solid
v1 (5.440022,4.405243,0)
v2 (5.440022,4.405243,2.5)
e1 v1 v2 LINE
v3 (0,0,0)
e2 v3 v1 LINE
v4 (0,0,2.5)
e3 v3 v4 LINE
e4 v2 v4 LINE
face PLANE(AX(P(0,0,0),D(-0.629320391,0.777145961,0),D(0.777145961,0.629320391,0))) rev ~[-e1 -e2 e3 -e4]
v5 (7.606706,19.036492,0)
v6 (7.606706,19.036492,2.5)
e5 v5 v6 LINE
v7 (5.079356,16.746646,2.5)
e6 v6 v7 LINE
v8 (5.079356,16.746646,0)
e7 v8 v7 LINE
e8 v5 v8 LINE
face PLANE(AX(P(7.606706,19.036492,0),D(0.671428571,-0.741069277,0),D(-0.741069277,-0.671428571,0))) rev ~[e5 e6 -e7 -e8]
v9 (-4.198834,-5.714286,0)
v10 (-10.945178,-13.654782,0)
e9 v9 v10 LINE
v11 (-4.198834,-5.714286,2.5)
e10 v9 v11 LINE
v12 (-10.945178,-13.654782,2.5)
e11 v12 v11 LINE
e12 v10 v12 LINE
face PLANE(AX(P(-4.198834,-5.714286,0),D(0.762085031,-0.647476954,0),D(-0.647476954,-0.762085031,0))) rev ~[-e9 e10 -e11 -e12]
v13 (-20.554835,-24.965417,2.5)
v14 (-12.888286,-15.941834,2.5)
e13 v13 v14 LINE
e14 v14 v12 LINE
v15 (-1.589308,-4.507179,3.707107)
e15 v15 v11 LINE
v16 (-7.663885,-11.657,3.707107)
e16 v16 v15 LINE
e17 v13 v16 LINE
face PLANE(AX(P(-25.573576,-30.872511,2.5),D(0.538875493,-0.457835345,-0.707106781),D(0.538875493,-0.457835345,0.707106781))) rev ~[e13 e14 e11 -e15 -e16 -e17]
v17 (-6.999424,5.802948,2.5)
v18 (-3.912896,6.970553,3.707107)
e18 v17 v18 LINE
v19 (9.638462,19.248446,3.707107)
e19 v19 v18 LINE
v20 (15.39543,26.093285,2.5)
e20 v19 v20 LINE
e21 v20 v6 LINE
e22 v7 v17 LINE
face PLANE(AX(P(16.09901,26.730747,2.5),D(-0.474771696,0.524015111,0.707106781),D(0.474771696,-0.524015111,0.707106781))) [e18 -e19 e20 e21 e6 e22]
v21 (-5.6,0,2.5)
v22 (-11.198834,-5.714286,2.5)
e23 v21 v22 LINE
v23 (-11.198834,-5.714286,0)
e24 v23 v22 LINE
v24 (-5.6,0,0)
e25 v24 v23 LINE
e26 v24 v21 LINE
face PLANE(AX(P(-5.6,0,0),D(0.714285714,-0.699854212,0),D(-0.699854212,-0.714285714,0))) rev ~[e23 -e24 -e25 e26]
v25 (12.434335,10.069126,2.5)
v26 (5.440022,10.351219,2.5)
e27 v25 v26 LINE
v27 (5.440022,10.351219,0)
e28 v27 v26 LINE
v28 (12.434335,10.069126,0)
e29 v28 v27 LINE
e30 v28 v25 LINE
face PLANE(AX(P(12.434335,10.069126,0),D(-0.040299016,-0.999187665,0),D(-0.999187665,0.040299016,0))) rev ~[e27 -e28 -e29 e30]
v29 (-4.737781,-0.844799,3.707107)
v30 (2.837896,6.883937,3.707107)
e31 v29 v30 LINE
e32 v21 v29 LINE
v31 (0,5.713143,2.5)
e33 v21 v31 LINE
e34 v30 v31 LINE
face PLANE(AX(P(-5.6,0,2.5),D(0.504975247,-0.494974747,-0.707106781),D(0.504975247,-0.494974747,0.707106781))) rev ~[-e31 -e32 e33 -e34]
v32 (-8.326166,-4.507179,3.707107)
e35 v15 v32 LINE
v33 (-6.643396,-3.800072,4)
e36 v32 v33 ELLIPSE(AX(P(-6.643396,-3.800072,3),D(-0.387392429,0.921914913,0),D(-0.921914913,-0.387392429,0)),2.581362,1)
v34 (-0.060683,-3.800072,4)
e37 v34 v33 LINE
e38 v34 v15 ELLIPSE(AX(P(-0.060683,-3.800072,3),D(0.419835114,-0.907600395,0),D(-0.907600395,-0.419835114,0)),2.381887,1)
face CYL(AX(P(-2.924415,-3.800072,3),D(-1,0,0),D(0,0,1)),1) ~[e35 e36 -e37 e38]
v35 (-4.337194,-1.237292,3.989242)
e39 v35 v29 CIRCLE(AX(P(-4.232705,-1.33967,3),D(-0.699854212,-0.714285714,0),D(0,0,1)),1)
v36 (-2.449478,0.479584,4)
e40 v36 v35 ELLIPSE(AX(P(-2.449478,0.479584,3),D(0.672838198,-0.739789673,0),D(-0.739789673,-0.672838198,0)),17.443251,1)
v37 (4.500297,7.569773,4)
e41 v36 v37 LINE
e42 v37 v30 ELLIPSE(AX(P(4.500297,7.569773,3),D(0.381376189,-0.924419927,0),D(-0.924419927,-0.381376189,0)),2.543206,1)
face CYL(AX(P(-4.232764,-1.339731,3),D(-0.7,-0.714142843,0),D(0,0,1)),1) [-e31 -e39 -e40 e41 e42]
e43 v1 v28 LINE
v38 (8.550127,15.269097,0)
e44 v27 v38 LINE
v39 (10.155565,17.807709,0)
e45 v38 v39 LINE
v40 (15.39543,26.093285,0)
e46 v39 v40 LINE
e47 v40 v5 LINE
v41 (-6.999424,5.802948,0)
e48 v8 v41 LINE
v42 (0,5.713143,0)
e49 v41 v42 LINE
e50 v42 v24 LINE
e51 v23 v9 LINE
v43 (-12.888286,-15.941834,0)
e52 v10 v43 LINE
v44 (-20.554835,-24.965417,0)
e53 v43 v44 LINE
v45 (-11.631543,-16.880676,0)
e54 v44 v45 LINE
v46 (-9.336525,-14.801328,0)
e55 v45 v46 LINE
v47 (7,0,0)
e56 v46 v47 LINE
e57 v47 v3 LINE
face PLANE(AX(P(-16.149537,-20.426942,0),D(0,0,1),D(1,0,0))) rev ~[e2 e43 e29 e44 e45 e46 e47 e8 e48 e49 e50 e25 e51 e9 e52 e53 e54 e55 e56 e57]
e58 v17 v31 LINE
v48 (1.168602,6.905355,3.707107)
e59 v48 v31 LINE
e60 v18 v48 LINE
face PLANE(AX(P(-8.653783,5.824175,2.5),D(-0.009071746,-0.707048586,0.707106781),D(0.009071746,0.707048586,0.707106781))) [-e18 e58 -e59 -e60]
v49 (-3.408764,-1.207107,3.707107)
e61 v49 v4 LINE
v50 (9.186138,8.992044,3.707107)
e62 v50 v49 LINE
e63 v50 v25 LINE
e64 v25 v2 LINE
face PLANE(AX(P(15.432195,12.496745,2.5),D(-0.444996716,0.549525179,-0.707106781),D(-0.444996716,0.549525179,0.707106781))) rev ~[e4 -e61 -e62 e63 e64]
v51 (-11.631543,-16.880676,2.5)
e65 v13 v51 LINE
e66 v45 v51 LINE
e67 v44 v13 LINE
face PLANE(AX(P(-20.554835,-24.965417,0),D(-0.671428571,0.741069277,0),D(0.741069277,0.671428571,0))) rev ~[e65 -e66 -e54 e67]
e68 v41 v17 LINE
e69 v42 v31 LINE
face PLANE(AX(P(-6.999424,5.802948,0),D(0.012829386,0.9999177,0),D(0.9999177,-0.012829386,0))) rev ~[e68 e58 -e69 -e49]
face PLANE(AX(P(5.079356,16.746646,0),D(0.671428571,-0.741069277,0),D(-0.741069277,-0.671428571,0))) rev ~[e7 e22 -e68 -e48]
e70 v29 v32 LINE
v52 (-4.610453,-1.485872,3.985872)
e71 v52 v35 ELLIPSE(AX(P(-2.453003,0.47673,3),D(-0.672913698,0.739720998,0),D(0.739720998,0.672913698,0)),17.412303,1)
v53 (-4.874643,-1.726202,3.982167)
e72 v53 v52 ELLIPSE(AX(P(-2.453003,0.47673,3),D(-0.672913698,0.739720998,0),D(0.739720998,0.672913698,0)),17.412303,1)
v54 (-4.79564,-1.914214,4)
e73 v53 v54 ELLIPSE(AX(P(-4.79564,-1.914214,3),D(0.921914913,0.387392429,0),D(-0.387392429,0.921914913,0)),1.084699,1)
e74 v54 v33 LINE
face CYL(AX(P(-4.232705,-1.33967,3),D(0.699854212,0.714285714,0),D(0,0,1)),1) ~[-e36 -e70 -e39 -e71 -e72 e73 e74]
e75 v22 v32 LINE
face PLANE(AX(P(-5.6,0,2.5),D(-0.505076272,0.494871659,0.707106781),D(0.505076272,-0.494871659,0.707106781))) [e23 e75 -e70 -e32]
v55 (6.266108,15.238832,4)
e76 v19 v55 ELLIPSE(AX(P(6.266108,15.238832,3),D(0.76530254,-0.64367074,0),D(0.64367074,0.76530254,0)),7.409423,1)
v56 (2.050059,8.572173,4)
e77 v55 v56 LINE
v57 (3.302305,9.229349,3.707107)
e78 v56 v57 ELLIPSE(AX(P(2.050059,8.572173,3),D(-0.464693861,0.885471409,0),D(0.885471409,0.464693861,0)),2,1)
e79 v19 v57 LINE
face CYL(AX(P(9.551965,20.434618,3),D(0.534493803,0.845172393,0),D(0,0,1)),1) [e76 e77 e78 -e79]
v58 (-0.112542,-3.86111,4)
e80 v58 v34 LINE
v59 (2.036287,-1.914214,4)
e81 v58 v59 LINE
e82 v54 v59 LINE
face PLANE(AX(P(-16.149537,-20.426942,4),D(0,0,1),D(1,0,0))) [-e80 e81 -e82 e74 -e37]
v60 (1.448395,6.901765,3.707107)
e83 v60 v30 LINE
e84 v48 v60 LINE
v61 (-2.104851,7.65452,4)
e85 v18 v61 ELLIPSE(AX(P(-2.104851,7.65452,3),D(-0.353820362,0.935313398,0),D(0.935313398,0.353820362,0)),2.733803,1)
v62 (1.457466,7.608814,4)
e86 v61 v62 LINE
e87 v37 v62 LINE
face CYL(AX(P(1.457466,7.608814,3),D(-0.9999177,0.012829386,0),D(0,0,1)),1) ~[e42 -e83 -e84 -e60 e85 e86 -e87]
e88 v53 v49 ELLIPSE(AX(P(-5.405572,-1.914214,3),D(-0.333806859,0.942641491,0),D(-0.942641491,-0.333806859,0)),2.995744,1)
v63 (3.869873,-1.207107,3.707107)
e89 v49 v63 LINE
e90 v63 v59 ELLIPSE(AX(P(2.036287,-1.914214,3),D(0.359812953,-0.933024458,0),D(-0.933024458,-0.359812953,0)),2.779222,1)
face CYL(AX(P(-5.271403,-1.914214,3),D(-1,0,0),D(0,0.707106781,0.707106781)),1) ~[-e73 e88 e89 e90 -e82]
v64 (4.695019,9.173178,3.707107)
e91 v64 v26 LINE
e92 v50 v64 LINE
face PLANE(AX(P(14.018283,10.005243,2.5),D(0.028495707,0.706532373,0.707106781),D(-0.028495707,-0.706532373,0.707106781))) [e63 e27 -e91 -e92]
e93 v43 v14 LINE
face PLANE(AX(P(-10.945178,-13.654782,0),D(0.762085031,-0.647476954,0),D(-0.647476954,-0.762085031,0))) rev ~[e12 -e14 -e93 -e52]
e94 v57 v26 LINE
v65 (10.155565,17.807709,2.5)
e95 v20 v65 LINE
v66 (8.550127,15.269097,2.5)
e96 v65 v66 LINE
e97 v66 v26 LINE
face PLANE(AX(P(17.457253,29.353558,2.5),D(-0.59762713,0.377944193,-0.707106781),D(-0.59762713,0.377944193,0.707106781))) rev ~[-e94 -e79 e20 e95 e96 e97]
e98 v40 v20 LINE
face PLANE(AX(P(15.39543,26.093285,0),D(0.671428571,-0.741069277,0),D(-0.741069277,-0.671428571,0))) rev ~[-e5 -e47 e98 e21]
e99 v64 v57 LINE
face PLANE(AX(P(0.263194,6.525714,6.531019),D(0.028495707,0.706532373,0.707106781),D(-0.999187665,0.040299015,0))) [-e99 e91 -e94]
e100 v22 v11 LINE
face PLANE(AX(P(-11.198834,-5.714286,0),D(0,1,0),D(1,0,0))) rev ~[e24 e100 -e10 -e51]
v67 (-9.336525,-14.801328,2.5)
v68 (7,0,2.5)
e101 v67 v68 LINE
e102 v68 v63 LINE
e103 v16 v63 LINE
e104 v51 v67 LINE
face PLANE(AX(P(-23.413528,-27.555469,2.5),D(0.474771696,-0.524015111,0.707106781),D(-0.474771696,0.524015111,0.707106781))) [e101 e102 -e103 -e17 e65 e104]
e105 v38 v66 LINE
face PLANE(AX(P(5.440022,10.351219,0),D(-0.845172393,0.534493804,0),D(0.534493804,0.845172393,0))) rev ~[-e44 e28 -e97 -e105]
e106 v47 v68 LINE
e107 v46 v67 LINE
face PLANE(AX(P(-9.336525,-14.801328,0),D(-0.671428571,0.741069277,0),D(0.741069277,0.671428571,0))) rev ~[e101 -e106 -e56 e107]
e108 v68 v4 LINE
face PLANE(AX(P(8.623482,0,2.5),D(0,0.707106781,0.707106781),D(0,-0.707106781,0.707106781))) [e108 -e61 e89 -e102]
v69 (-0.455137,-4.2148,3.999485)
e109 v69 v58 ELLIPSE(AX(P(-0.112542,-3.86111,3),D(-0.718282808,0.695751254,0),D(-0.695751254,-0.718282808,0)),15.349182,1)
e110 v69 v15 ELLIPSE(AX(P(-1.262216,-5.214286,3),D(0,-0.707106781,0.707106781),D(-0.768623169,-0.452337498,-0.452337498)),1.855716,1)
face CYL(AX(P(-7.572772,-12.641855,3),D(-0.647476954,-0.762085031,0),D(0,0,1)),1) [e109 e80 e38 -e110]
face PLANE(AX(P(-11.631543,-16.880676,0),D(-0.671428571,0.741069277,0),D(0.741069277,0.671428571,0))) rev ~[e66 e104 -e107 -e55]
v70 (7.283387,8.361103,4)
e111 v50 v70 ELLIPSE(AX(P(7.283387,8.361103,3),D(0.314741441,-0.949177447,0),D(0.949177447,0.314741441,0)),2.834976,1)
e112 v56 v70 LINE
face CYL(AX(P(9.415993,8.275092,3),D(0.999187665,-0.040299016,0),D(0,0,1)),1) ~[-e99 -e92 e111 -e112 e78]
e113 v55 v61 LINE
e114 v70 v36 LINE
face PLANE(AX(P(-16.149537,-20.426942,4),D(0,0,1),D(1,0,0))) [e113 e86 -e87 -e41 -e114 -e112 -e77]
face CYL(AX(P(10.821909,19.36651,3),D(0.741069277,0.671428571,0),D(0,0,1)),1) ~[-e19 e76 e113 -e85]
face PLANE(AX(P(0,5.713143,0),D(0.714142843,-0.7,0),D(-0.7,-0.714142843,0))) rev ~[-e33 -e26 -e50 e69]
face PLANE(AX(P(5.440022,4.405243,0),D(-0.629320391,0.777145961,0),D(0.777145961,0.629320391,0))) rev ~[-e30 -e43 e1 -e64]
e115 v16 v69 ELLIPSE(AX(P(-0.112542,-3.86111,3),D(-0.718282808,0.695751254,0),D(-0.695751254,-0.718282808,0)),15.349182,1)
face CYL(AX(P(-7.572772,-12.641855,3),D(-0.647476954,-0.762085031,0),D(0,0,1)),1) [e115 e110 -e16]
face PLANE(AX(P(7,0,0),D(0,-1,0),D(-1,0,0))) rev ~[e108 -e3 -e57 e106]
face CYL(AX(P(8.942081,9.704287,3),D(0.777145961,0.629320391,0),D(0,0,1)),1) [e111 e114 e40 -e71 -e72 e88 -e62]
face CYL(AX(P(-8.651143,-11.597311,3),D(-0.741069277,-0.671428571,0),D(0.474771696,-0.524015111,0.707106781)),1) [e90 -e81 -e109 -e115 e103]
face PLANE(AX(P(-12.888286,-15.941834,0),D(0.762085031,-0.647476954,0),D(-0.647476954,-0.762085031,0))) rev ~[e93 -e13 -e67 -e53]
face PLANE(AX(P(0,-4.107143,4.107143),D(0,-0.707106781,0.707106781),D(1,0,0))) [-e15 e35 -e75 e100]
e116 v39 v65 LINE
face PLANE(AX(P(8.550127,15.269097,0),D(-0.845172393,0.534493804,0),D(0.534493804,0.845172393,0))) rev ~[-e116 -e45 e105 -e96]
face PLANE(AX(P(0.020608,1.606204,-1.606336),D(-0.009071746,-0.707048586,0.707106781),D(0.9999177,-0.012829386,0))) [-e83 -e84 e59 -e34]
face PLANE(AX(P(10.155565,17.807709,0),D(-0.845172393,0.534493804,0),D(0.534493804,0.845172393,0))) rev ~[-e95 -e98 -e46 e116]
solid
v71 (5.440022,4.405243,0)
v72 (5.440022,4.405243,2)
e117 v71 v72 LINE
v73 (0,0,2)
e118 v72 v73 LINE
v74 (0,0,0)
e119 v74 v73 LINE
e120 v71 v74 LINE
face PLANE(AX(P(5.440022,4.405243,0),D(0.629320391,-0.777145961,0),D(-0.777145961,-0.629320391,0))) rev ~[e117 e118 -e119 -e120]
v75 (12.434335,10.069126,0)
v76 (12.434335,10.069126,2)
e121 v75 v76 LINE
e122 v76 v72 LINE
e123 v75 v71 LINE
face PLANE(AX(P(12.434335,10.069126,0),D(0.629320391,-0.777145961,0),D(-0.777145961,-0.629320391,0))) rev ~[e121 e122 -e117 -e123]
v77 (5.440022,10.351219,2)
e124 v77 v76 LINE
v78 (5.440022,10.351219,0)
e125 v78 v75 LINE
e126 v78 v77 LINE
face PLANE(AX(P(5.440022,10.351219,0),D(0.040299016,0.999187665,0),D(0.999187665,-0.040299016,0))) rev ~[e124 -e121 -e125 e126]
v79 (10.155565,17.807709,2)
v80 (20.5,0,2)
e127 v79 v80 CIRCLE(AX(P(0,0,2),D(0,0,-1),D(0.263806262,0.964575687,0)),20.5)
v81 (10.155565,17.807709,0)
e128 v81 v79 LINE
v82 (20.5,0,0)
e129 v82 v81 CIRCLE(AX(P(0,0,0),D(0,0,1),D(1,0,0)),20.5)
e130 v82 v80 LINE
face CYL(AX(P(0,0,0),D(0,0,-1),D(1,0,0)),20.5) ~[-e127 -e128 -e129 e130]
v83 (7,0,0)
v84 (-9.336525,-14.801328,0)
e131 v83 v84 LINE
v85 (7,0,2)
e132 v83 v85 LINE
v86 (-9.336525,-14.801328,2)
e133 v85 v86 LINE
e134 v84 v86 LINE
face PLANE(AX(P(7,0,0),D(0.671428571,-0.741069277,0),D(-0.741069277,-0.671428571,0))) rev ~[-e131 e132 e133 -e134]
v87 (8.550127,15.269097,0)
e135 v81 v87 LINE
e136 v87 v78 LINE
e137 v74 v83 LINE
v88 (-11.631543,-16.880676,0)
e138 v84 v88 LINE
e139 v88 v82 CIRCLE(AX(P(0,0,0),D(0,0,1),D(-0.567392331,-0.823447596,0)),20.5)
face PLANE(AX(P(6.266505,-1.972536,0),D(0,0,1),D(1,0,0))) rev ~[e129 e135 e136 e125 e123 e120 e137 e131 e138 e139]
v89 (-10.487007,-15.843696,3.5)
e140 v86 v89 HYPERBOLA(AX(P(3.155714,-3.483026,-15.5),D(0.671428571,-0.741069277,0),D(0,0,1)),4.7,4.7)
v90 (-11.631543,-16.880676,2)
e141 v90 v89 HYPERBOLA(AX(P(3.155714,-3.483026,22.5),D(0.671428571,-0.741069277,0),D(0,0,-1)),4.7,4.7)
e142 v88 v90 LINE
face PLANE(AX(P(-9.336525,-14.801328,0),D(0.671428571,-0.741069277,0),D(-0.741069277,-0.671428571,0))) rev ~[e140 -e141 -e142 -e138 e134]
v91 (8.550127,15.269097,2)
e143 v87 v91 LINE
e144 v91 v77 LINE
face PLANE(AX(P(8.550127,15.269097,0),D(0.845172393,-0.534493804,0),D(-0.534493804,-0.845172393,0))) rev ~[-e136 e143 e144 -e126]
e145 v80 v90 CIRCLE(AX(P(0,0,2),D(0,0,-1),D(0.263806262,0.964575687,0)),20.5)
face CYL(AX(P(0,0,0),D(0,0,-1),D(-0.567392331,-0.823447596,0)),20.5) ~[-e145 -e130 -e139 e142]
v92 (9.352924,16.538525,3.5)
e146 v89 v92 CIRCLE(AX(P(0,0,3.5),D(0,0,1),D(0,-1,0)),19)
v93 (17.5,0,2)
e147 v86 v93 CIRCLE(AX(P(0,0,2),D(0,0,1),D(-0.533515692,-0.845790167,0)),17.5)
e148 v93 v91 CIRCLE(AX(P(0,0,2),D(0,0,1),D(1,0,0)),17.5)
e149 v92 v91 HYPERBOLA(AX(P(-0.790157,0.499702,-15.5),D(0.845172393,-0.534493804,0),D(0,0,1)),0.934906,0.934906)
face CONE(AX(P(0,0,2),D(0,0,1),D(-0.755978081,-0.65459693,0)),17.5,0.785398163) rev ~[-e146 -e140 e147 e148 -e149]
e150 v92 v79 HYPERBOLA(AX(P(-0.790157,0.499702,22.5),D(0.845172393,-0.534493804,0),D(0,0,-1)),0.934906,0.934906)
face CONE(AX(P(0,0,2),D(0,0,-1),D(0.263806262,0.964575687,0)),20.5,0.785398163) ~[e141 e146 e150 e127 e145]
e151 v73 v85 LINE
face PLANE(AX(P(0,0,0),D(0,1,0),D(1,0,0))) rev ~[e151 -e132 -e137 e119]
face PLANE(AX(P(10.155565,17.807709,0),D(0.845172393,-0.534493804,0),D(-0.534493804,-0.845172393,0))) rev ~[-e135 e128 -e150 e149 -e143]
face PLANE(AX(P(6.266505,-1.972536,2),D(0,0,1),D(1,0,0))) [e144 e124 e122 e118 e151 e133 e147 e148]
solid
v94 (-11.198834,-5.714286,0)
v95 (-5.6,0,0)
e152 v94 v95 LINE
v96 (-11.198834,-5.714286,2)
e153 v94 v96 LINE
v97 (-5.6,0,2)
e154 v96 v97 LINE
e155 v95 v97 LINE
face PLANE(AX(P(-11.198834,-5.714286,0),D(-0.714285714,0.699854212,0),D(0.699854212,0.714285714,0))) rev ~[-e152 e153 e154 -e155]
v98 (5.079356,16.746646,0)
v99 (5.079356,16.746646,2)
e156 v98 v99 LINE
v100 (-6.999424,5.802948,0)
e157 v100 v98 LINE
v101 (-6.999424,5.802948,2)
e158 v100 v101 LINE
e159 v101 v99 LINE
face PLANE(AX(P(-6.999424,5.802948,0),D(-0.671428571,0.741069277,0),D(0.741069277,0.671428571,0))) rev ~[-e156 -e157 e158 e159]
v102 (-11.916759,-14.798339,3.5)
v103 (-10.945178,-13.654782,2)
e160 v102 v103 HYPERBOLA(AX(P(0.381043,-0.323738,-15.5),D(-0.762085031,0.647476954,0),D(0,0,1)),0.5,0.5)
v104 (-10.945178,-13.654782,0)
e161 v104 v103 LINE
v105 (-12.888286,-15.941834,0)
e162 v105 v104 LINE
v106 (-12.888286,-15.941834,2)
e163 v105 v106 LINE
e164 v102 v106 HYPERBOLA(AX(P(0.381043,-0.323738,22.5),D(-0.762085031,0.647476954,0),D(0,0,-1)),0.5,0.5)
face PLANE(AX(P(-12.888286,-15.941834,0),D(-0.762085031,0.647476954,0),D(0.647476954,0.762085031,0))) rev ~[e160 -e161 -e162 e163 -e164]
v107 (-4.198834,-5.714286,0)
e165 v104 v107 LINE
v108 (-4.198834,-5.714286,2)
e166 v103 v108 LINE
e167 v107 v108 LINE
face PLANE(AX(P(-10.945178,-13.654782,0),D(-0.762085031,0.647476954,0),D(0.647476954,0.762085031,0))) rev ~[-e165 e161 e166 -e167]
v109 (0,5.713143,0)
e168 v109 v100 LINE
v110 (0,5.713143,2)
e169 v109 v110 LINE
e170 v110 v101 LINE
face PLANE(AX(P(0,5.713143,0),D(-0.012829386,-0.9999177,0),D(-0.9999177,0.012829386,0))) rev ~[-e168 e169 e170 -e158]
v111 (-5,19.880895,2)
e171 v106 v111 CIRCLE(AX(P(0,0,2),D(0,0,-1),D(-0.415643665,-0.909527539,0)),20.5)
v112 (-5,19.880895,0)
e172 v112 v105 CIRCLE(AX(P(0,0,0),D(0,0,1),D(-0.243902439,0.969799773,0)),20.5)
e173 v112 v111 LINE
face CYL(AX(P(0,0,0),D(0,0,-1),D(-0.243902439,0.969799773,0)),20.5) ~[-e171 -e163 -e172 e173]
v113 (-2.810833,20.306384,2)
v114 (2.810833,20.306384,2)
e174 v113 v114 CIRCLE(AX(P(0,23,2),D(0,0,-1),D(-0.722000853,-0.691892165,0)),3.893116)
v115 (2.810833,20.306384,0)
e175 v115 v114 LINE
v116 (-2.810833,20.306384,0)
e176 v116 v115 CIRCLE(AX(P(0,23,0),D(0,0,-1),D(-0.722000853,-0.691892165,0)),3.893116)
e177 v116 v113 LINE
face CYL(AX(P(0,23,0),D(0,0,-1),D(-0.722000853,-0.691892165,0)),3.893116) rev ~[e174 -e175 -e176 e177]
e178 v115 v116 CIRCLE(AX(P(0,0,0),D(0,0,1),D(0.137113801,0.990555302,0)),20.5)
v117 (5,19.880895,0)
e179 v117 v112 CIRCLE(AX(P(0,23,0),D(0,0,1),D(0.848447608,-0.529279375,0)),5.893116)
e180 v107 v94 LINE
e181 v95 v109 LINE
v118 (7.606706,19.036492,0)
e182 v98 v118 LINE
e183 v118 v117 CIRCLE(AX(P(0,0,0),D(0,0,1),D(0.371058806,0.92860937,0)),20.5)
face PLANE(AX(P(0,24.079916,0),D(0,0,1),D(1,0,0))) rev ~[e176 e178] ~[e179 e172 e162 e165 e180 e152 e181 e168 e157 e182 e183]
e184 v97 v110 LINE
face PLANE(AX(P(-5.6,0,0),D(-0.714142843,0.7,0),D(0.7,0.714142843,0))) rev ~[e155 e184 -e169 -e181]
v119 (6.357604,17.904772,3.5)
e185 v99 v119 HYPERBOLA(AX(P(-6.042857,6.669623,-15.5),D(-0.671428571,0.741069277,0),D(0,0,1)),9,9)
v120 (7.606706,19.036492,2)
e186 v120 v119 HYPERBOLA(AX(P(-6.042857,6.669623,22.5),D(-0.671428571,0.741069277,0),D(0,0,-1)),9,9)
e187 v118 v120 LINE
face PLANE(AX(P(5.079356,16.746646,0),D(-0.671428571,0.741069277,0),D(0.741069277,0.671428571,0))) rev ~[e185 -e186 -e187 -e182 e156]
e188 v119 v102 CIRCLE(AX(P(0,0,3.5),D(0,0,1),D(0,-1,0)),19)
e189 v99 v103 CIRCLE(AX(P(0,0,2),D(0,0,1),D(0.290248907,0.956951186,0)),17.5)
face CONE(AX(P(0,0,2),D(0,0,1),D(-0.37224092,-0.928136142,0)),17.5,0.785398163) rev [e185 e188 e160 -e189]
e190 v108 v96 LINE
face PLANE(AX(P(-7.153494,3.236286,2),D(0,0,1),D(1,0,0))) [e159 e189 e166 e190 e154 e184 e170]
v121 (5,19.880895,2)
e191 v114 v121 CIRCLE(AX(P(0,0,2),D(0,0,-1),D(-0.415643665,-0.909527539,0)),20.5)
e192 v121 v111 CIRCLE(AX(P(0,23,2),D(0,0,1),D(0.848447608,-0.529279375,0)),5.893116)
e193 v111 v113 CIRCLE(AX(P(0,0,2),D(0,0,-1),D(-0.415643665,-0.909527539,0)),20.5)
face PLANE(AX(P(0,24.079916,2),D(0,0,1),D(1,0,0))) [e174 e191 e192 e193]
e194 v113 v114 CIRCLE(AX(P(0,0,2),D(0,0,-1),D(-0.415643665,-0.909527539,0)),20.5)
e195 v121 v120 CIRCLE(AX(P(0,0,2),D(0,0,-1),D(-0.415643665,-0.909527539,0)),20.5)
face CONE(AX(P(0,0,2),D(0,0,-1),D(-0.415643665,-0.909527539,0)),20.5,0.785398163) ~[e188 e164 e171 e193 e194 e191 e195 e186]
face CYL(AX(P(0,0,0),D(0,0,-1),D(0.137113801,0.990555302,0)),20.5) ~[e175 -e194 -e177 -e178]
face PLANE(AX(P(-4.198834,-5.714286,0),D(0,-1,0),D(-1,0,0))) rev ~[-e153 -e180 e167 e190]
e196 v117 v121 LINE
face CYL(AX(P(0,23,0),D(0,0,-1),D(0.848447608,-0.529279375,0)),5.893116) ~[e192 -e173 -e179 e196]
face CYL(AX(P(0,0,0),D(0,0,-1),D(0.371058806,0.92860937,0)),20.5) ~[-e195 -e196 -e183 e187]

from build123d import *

# Parameters (mm, degrees)
F1_DEPTH      = 4
F2_DEPTH      = 2
F3_DEPTH      = 4
F4_T4_ANGLE   = 191.8794829406
F4_T7_ANGLE   = 191.6152635237
F4_2_T4_ANGLE = 216.7313007881
F4_2_T7_ANGLE = 213.6722162464
F5_T1_DEPTH   = 44.8975853427
F5_T6_DEPTH   = 12.4810064107
F5_T11_DEPTH  = 26.0985725575
F5_T16_DEPTH  = 12.442760274
F5_T21_DEPTH  = 28.0729631379
F5_T23_DEPTH  = 35.0265854945
F5_T28_DEPTH  = 12.5120201061
F5_T30_DEPTH  = 11.8575244819
F5_T35_DEPTH  = 13.9320278094
F5_T40_DEPTH  = 12.6150489639
F5_T45_DEPTH  = 38.8381685856
F6_T1_DEPTH   = 19.5328240955
F6_T3_DEPTH   = 5.6520455224
F6_T5_DEPTH   = 16.5312582393
F6_T7_DEPTH   = 5.740258782
F6_T9_DEPTH   = 5.4658400603
F6_T14_DEPTH  = 14.3536282373
F6_T19_DEPTH  = 7.6900173534
F6_T24_DEPTH  = 3.1100372333
F6_T29_DEPTH  = 12.5427572364
F6_T34_DEPTH  = 18.3278104704
F6_T39_DEPTH  = 9.4173142872
F6_T44_DEPTH  = 3.0038182041
F6_T49_DEPTH  = 11.742181059
F6_T55_DEPTH  = 14.3536282373
F6_T59_DEPTH  = 7.6900173534
F6_T66_DEPTH  = 12.5427572364
F6_T70_DEPTH  = 3.1100372333
F6_T77_DEPTH  = 9.4173142872
F6_T81_DEPTH  = 18.3278104704
F6_T88_DEPTH  = 11.742181059
F6_T92_DEPTH  = 3.0038182041
F7_DEPTH      = 2


# Not quite as in the source:
# - a fillet or chamfer that OpenCascade refuses, or shapes differently, is made with other operations: its cross-section is extruded or revolved along the edge and cut away or added


with BuildPart() as f1:
    # F0 (on Top) → F1 (new body)
    with BuildSketch(Plane.XY):
        with BuildLine():
            ThreePointArc((7.6067055324, 19.0364920861), (6.317476578, 19.5022944723), (5, 19.8808953521))
            ThreePointArc((5, 19.8808953521), (3.9112066982, 20.1234306758), (2.8108329276, 20.3063836823))
            ThreePointArc((2.8108329276, 20.3063836823), (0, 20.5), (-2.8108329276, 20.3063836823))
            ThreePointArc((-2.8108329276, 20.3063836823), (-3.9112066982, 20.1234306758), (-5, 19.8808953521))
            ThreePointArc((-5, 19.8808953521), (-20.0203567241, 4.4085504011), (-12.8882864218, -15.9418340573))
            Line((-12.8882864218, -15.9418340573), (-10.945178398, -13.6547819402))
            ThreePointArc((-10.945178398, -13.6547819402), (-15.4810745708, 8.1600447385), (5.0793558765, 16.7466457501))
            Line((5.0793558765, 16.7466457501), (7.6067055324, 19.0364920861))
        make_face()
    extrude(amount=F1_DEPTH)

    # F0 (on Top) → F2 (join)
    with BuildSketch(Plane.XY):
        with BuildLine():
            Line((-6.9994239003, 5.8029484458), (5.0793558765, 16.7466457501))
            ThreePointArc((5.0793558765, 16.7466457501), (-15.4810745708, 8.1600447385), (-10.945178398, -13.6547819402))
            Line((-10.945178398, -13.6547819402), (-4.1988336978, -5.7142857143))
            Line((-4.1988336978, -5.7142857143), (-11.1988336978, -5.7142857143))
            Line((-11.1988336978, -5.7142857143), (-5.6, 0))
            Line((-5.6, 0), (0, 5.7131427428))
            Line((0, 5.7131427428), (-6.9994239003, 5.8029484458))
        make_face()
    extrude(amount=F2_DEPTH)

    # F4: chamfer of 2 on 2 edges, made by hand


with BuildPart() as f1b:
    # F0 (on Top) → F1, piece 2 (new body)
    with BuildSketch(Plane.XY):
        with BuildLine():
            ThreePointArc((20.5, 0), (17.7262389076, 10.297109021), (10.1555654448, 17.807708738))
            Line((10.1555654448, 17.807708738), (8.5501270855, 15.2690971188))
            ThreePointArc((8.5501270855, 15.2690971188), (15.0976359738, 8.8493721812), (17.5, 0))
            ThreePointArc((17.5, 0), (8.4516512974, -15.3238242729), (-9.336524611, -14.8013279197))
            Line((-9.336524611, -14.8013279197), (-11.6315427767, -16.8806757162))
            ThreePointArc((-11.6315427767, -16.8806757162), (9.5342375961, -18.1479561786), (20.5, 0))
        make_face()
    extrude(amount=F1_DEPTH)

    # F0 (on Top) → F2, piece 2 (join)
    with BuildSketch(Plane.XY):
        with BuildLine():
            ThreePointArc((17.5, 0), (15.0976359738, 8.8493721812), (8.5501270855, 15.2690971188))
            Line((8.5501270855, 15.2690971188), (5.4400217302, 10.3512193653))
            Line((5.4400217302, 10.3512193653), (12.4343353833, 10.0691262568))
            Line((12.4343353833, 10.0691262568), (5.4400217302, 4.4052427373))
            Line((5.4400217302, 4.4052427373), (0, 0))
            Line((0, 0), (7, 0))
            Line((7, 0), (-9.336524611, -14.8013279197))
            ThreePointArc((-9.336524611, -14.8013279197), (8.4516512974, -15.3238242729), (17.5, 0))
        make_face()
    extrude(amount=F2_DEPTH)

    # F4#2: chamfer of 2 on 2 edges, made by hand


with BuildPart() as f3:
    # F0 (on Top) → F3 (new body)
    with BuildSketch(Plane.XY):
        with BuildLine():
            ThreePointArc((-11.6315427767, -16.8806757162), (-12.2688981533, -16.4232803698), (-12.8882864218, -15.9418340573))
            Line((-12.8882864218, -15.9418340573), (-20.5548353552, -24.9654172829))
            Line((-20.5548353552, -24.9654172829), (-11.6315427767, -16.8806757162))
        make_face()
        with BuildLine():
            Line((-10.945178398, -13.6547819402), (-12.8882864218, -15.9418340573))
            ThreePointArc((-12.8882864218, -15.9418340573), (-12.2688981533, -16.4232803698), (-11.6315427767, -16.8806757162))
            Line((-11.6315427767, -16.8806757162), (-9.336524611, -14.8013279197))
            ThreePointArc((-9.336524611, -14.8013279197), (-10.1570424415, -14.2507715174), (-10.945178398, -13.6547819402))
        make_face()
        with BuildLine():
            ThreePointArc((8.5501270855, 15.2690971188), (6.8546691344, 16.1016617483), (5.0793558765, 16.7466457501))
            Line((5.0793558765, 16.7466457501), (-6.9994239003, 5.8029484458))
            Line((-6.9994239003, 5.8029484458), (0, 5.7131427428))
            Line((0, 5.7131427428), (-5.6, 0))
            Line((-5.6, 0), (-11.1988336978, -5.7142857143))
            Line((-11.1988336978, -5.7142857143), (-4.1988336978, -5.7142857143))
            Line((-4.1988336978, -5.7142857143), (-10.945178398, -13.6547819402))
            ThreePointArc((-10.945178398, -13.6547819402), (-10.1570424415, -14.2507715174), (-9.336524611, -14.8013279197))
            Line((-9.336524611, -14.8013279197), (7, 0))
            Line((7, 0), (0, 0))
            Line((0, 0), (5.4400217302, 4.4052427373))
            Line((5.4400217302, 4.4052427373), (12.4343353833, 10.0691262568))
            Line((12.4343353833, 10.0691262568), (5.4400217302, 10.3512193653))
            Line((5.4400217302, 10.3512193653), (8.5501270855, 15.2690971188))
        make_face()
        with BuildLine():
            ThreePointArc((10.1555654448, 17.807708738), (8.9023617482, 18.4661299493), (7.6067055324, 19.0364920861))
            Line((7.6067055324, 19.0364920861), (5.0793558765, 16.7466457501))
            ThreePointArc((5.0793558765, 16.7466457501), (6.8546691344, 16.1016617483), (8.5501270855, 15.2690971188))
            Line((8.5501270855, 15.2690971188), (10.1555654448, 17.807708738))
        make_face()
        with BuildLine():
            Line((15.3954302851, 26.0932848794), (7.6067055324, 19.0364920861))
            ThreePointArc((7.6067055324, 19.0364920861), (8.9023617482, 18.4661299493), (10.1555654448, 17.807708738))
            Line((10.1555654448, 17.807708738), (15.3954302851, 26.0932848794))
        make_face()
    extrude(amount=F3_DEPTH)

    # F5: chamfer of 1.5 on 11 edges, made by hand

    # F5_s2 → F5_t1 (cut)
    with BuildSketch(Plane(origin=(-26.5692425202, -24.0724438327, 0), x_dir=(0, 0, 1), z_dir=(0.7410692771, 0.6714285714, 0))):
        Polygon((2.5, 4.7), (4, 3.2), (4, 4.7), align=None)
    extrude(amount=F5_T1_DEPTH, mode=Mode.SUBTRACT)


with BuildPart() as f4_tool2:
    # F4_s3 → F4_t4 (revolve)
    with BuildSketch(Plane(origin=(0, 0, 0), x_dir=(0, 0, 1), z_dir=(0.9281361418, -0.3722409198, 0))):
        Polygon((2, 17.5), (4, 19.5), (4, 17.5), align=None)
    revolve(axis=Axis((0, 0, 4), (0, 0, -1)), revolution_arc=F4_T4_ANGLE)

    split(bisect_by=Plane.XY.offset(2), keep=Keep.TOP)


with BuildPart() as f1_1:
    add(f1.part)

    # F4_t1: cut F4_tool2
    add(f4_tool2.part, mode=Mode.SUBTRACT)

    # F4_s6 → F4_t7 (revolve, cut)
    with BuildSketch(Plane(origin=(0, 0, 0), x_dir=(0, 0, 1), z_dir=(0.9095275389, -0.4156436646, 0))):
        Polygon((2, 20.5), (4, 18.5), (4, 20.5), align=None)
    revolve(axis=Axis((0, 0, 4), (0, 0, -1)), revolution_arc=F4_T7_ANGLE, mode=Mode.SUBTRACT)

    # F0 (on Top) → F7 (join)
    with BuildSketch(Plane.XY):
        with BuildLine():
            ThreePointArc((2.8108329276, 20.3063836823), (3.9112066982, 20.1234306758), (5, 19.8808953521))
            ThreePointArc((5, 19.8808953521), (0, 28.8931157977), (-5, 19.8808953521))
            ThreePointArc((-5, 19.8808953521), (-3.9112066982, 20.1234306758), (-2.8108329276, 20.3063836823))
            ThreePointArc((-2.8108329276, 20.3063836823), (0, 26.8931157977), (2.8108329276, 20.3063836823))
        make_face()
    extrude(amount=F7_DEPTH)


with BuildPart() as f4_2_tool2:
    # F4_2_s3 → F4_2_t4 (revolve)
    with BuildSketch(Plane(origin=(0, 0, 0), x_dir=(0, 0, 1), z_dir=(-0.6545969301, 0.7559780811, 0))):
        Polygon((2, -17.5), (4, -19.5), (4, -17.5), align=None)
    revolve(axis=Axis((0, 0, 4), (0, 0, 1)), revolution_arc=F4_2_T4_ANGLE)

    split(bisect_by=Plane.XY.offset(2), keep=Keep.TOP)


with BuildPart() as f1b_1:
    add(f1b.part)

    # F4_2_t1: cut F4_2_tool2
    add(f4_2_tool2.part, mode=Mode.SUBTRACT)

    # F4_2_s6 → F4_2_t7 (revolve, cut)
    with BuildSketch(Plane(origin=(0, 0, 0), x_dir=(0, 0, 1), z_dir=(-0.964575687, 0.2638062623, 0))):
        Polygon((2, 20.5), (4, 18.5), (4, 20.5), align=None)
    revolve(axis=Axis((0, 0, 4), (0, 0, -1)), revolution_arc=F4_2_T7_ANGLE, mode=Mode.SUBTRACT)


with BuildPart() as f5_tool4:
    # F5_s5 → F5_t6 (new body)
    with BuildSketch(Plane.YZ.offset(8.6234819288)):
        Polygon((0, 2.5), (-1.5, 4), (0, 4), align=None)
    extrude(amount=-F5_T6_DEPTH)

    split(bisect_by=Plane(origin=(0, 0, 0), x_dir=(0, 0, 1), z_dir=(0.629320391, -0.7771459615, 0)), keep=Keep.TOP)


with BuildPart() as f3_1:
    add(f3.part)

    # F5_t3: cut F5_tool4
    add(f5_tool4.part, mode=Mode.SUBTRACT)


with BuildPart() as f5_tool9:
    # F5_s10 → F5_t11 (new body)
    with BuildSketch(Plane(origin=(15.4321949557, 12.4967450723, 0), x_dir=(0, 0, 1), z_dir=(-0.7771459615, -0.629320391, 0))):
        Polygon((2.5, 0), (4, 1.5), (4, 0), align=None)
    extrude(amount=F5_T11_DEPTH)

    split(bisect_by=Plane(origin=(0, 1.25, 1.25), x_dir=(1, 0, 0), z_dir=(0, 0.7071067812, 0.7071067812)), keep=Keep.TOP)


with BuildPart() as f3_2:
    add(f3_1.part)

    # F5_t8: cut F5_tool9
    add(f5_tool9.part, mode=Mode.SUBTRACT)


with BuildPart() as f5_tool14:
    # F5_s15 → F5_t16 (new body)
    with BuildSketch(Plane(origin=(13.5926436903, -0.5482154936, 0), x_dir=(0, 0, 1), z_dir=(-0.9991876647, 0.0402990155, 0))):
        Polygon((2.5, 10.5620382248), (4, 9.0620382248), (4, 10.5620382248), align=None)
    extrude(amount=F5_T16_DEPTH)

    split(bisect_by=Plane(origin=(-0.7901571012, 0.4997016915, 0), x_dir=(0, 0, 1), z_dir=(0.8451723931, -0.5344938035, 0)), keep=Keep.TOP)


with BuildPart() as f3_3:
    add(f3_2.part)

    # F5_t13: cut F5_tool14
    add(f5_tool14.part, mode=Mode.SUBTRACT)


with BuildPart() as f5_tool19:
    # F5_s20 → F5_t21 (new body)
    with BuildSketch(Plane(origin=(18.247410319, 28.8538563855, 0), x_dir=(0, 0, 1), z_dir=(-0.5344938035, -0.8451723931, 0))):
        Polygon((2.5, 0.9349064259), (4, 2.4349064259), (4, 0.9349064259), align=None)
    extrude(amount=F5_T21_DEPTH)

    split(bisect_by=Plane(origin=(0.2631936405, 6.5257137352, 6.5310191124), x_dir=(-0.9991876647, 0.0402990155, 0), z_dir=(0.0284957071, 0.7065323734, 0.7071067812)), keep=Keep.TOP)


with BuildPart() as f3_4:
    add(f3_3.part)

    # F5_t18: cut F5_tool19
    add(f5_tool19.part, mode=Mode.SUBTRACT)

    # F5_s24 → F5_t23 (cut)
    with BuildSketch(Plane(origin=(22.1418667552, 20.0611230603, 0), x_dir=(0, 0, 1), z_dir=(-0.7410692771, -0.6714285714, 0))):
        Polygon((2.5, 9), (4, 7.5), (4, 9), align=None)
    extrude(amount=F5_T23_DEPTH, mode=Mode.SUBTRACT)


with BuildPart() as f5_tool26:
    # F5_s27 → F5_t28 (new body)
    with BuildSketch(Plane(origin=(-8.7270734415, 0.1119722104, 0), x_dir=(0, 0, 1), z_dir=(0.9999177, -0.0128293861, 0))):
        Polygon((2.5, -5.7126725514), (4, -7.2126725514), (4, -5.7126725514), align=None)
    extrude(amount=F5_T28_DEPTH)

    split(bisect_by=Plane(origin=(-2.856, 2.799439944, 0), x_dir=(0, 0, 1), z_dir=(-0.7141428429, 0.7, 0)), keep=Keep.TOP)


with BuildPart() as f3_5:
    add(f3_4.part)

    # F5_t25: cut F5_tool26
    add(f5_tool26.part, mode=Mode.SUBTRACT)

    # F5_s31 → F5_t30 (cut)
    with BuildSketch(Plane(origin=(-2.7428571429, -2.7994168489, 0), x_dir=(0, 0, 1), z_dir=(-0.6998542122, -0.7142857143, 0))):
        Polygon((2.5, 4), (4, 2.5), (4, 4), align=None)
    extrude(amount=F5_T30_DEPTH, mode=Mode.SUBTRACT)


with BuildPart() as f5_tool33:
    # F5_s34 → F5_t35 (new body)
    with BuildSketch(Plane(origin=(-2.744, -2.799439944, 0), x_dir=(0, 0, 1), z_dir=(0.7, 0.7141428429, 0))):
        Polygon((2.5, -3.99919992), (4, -2.49919992), (4, -3.99919992), align=None)
    extrude(amount=F5_T35_DEPTH)

    split(bisect_by=Plane(origin=(0.0206083084, 1.6062040743, -1.6063362757), x_dir=(0.9999177, -0.0128293861, 0), z_dir=(-0.0090717459, -0.7070485863, 0.7071067812)), keep=Keep.TOP)


with BuildPart() as f3_6:
    add(f3_5.part)

    # F5_t32: cut F5_tool33
    add(f5_tool33.part, mode=Mode.SUBTRACT)


with BuildPart() as f5_tool38:
    # F5_s39 → F5_t40 (new body)
    with BuildSketch(Plane.YZ.offset(-12.9563581797)):
        Polygon((-5.7142857143, 2.5), (-4.2142857143, 4), (-5.7142857143, 4), align=None)
    extrude(amount=F5_T40_DEPTH)

    split(bisect_by=Plane(origin=(0.3810425154, -0.3237384769, 0), x_dir=(0, 0, 1), z_dir=(-0.7620850308, 0.6474769539, 0)), keep=Keep.TOP)


with BuildPart() as f3_7:
    add(f3_6.part)

    # F5_t37: cut F5_tool38
    add(f5_tool38.part, mode=Mode.SUBTRACT)


with BuildPart() as f5_tool43:
    # F5_s44 → F5_t45 (new body)
    with BuildSketch(Plane(origin=(-25.9546183807, -30.5487724767, 0), x_dir=(0, 0, 1), z_dir=(0.6474769539, 0.7620850308, 0))):
        Polygon((2.5, 0.5), (4, 2), (4, 0.5), align=None)
    extrude(amount=F5_T45_DEPTH)

    split(bisect_by=Plane(origin=(0, -4.1071428571, 4.1071428571), x_dir=(1, 0, 0), z_dir=(0, -0.7071067812, 0.7071067812)), keep=Keep.TOP)


with BuildPart() as f3_8:
    add(f3_7.part)

    # F5_t42: cut F5_tool43
    add(f5_tool43.part, mode=Mode.SUBTRACT)

    # F6: fillet of radius 1 on 13 edges, made by hand

    # F6_s2 → F6_t1 (cut)
    with BuildSketch(Plane(origin=(15.5795084063, 14.1154510057, 0), x_dir=(0, 0, 1), z_dir=(-0.7410692771, -0.6714285714, 0))):
        with BuildLine():
            ThreePointArc((4, 7.0857864376), (3.9238795325, 7.46846987), (3.7071067812, 7.7928932188))
            Line((3.7071067812, 7.7928932188), (4, 7.5))
            Line((4, 7.5), (4, 7.0857864376))
        make_face()
    extrude(amount=F6_T1_DEPTH, mode=Mode.SUBTRACT)

    # F6_s4 → F6_t3 (cut)
    with BuildSketch(Plane(origin=(-4.2919621914, 0.0550677723, 0), x_dir=(0, 0, 1), z_dir=(0.9999177, -0.0128293861, 0))):
        with BuildLine():
            ThreePointArc((4, -7.6268861138), (3.9238795325, -7.2442026814), (3.7071067812, -6.9197793326))
            Line((3.7071067812, -6.9197793326), (4, -7.2126725514))
            Line((4, -7.2126725514), (4, -7.6268861138))
        make_face()
    extrude(amount=F6_T3_DEPTH, mode=Mode.SUBTRACT)

    # F6_s6 → F6_t5 (cut)
    with BuildSketch(Plane(origin=(-10.5215995116, -9.5328503656, 0), x_dir=(0, 0, 1), z_dir=(0.7410692771, 0.6714285714, 0))):
        with BuildLine():
            ThreePointArc((3.7071067812, 3.4928932188), (3.9238795325, 3.16846987), (4, 2.7857864376))
            Line((4, 2.7857864376), (4, 3.2))
            Line((4, 3.2), (3.7071067812, 3.4928932188))
        make_face()
    extrude(amount=F6_T5_DEPTH, mode=Mode.SUBTRACT)

    # F6_s8 → F6_t7 (cut)
    with BuildSketch(Plane.YZ.offset(-8.6646737581)):
        with BuildLine():
            ThreePointArc((-3.8000721519, 4), (-4.1827555843, 3.9238795325), (-4.5071789331, 3.7071067812))
            Line((-4.5071789331, 3.7071067812), (-4.2142857143, 4))
            Line((-4.2142857143, 4), (-3.8000721519, 4))
        make_face()
    extrude(amount=F6_T7_DEPTH, mode=Mode.SUBTRACT)

    # F6_s10 → F6_t9 (cut)
    with BuildSketch(Plane(origin=(-2.7428571429, -2.7994168489, 0), x_dir=(0, 0, 1), z_dir=(-0.6998542122, -0.7142857143, 0))):
        with BuildLine():
            ThreePointArc((4, 2.0857864376), (3.9238795325, 2.46846987), (3.7071067812, 2.7928932188))
            Line((3.7071067812, 2.7928932188), (4, 2.5))
            Line((4, 2.5), (4, 2.0857864376))
        make_face()
    extrude(amount=F6_T9_DEPTH, mode=Mode.SUBTRACT)


with BuildPart() as f6_tool12:
    # F6_s13 → F6_t14 (new body)
    with BuildSketch(Plane(origin=(11.9599620904, 18.9117810419, 0), x_dir=(0, 0, 1), z_dir=(-0.5344938035, -0.8451723931, 0))):
        with BuildLine():
            ThreePointArc((4, 2.8491199883), (3.9238795325, 2.4664365559), (3.7071067812, 2.1420132071))
            Line((3.7071067812, 2.1420132071), (4, 2.4349064259))
            Line((4, 2.4349064259), (4, 2.8491199883))
        make_face()
    extrude(amount=F6_T14_DEPTH)

    split(bisect_by=Plane(origin=(0.2631936405, 6.5257137352, 6.5310191124), x_dir=(-0.9991876647, 0.0402990155, 0), z_dir=(0.0284957071, 0.7065323734, 0.7071067812)), keep=Keep.TOP)


with BuildPart() as f3_9:
    add(f3_8.part)

    # F6_t11: cut F6_tool12
    add(f6_tool12.part, mode=Mode.SUBTRACT)


with BuildPart() as f6_tool17:
    # F6_s18 → F6_t19 (new body)
    with BuildSketch(Plane(origin=(9.0674940614, -0.3657081614, 0), x_dir=(0, 0, 1), z_dir=(-0.9991876647, 0.0402990155, 0))):
        with BuildLine():
            ThreePointArc((4, 8.6478246624), (3.9238795325, 9.0305080948), (3.7071067812, 9.3549314436))
            Line((3.7071067812, 9.3549314436), (4, 9.0620382248))
            Line((4, 9.0620382248), (4, 8.6478246624))
        make_face()
    extrude(amount=F6_T19_DEPTH)

    split(bisect_by=Plane(origin=(0.6613869407, -0.4182664087, 0.7825467871), x_dir=(0.5344938035, 0.8451723931, 0), z_dir=(0.5976271304, -0.377944193, 0.7071067812)), keep=Keep.TOP)


with BuildPart() as f3_10:
    add(f3_9.part)

    # F6_t16: cut F6_tool17
    add(f6_tool17.part, mode=Mode.SUBTRACT)


with BuildPart() as f6_tool22:
    # F6_s23 → F6_t24 (new body)
    with BuildSketch(Plane(origin=(1.3596181679, -0.0174445022, 0), x_dir=(0, 0, 1), z_dir=(0.9999177, -0.0128293861, 0))):
        with BuildLine():
            ThreePointArc((4, -7.6268861138), (3.9238795325, -7.2442026814), (3.7071067812, -6.9197793326))
            Line((3.7071067812, -6.9197793326), (4, -7.2126725514))
            Line((4, -7.2126725514), (4, -7.6268861138))
        make_face()
    extrude(amount=F6_T24_DEPTH)

    split(bisect_by=Plane(origin=(-2.3206785536, 2.274719972, 3.24959996), x_dir=(-0.7, -0.7141428429, 0), z_dir=(-0.5049752469, 0.4949747468, 0.7071067812)), keep=Keep.TOP)


with BuildPart() as f3_11:
    add(f3_10.part)

    # F6_t21: cut F6_tool22
    add(f6_tool22.part, mode=Mode.SUBTRACT)


with BuildPart() as f6_tool27:
    # F6_s28 → F6_t29 (new body)
    with BuildSketch(Plane(origin=(-2.7437856705, -2.7992212842, 0), x_dir=(0, 0, 1), z_dir=(0.7, 0.7141428429, 0))):
        with BuildLine():
            ThreePointArc((4, -2.0849863576), (3.9238795325, -2.46766979), (3.7071067812, -2.7920931388))
            Line((3.7071067812, -2.7920931388), (4, -2.49919992))
            Line((4, -2.49919992), (4, -2.0849863576))
        make_face()
    extrude(amount=F6_T29_DEPTH)

    split(bisect_by=Plane(origin=(0.0206083084, 1.6062040743, -1.6063362757), x_dir=(0.9999177, -0.0128293861, 0), z_dir=(-0.0090717459, -0.7070485863, 0.7071067812)), keep=Keep.TOP)


with BuildPart() as f3_12:
    add(f3_11.part)

    # F6_t26: cut F6_tool27
    add(f6_tool27.part, mode=Mode.SUBTRACT)


with BuildPart() as f6_tool32:
    # F6_s33 → F6_t34 (new body)
    with BuildSketch(Plane(origin=(10.1467341546, 8.2166633075, 0), x_dir=(0, 0, 1), z_dir=(-0.7771459615, -0.629320391, 0))):
        with BuildLine():
            ThreePointArc((4, 1.9142135624), (3.9238795325, 1.53153013), (3.7071067812, 1.2071067812))
            Line((3.7071067812, 1.2071067812), (4, 1.5))
            Line((4, 1.5), (4, 1.9142135624))
        make_face()
    extrude(amount=F6_T34_DEPTH)

    split(bisect_by=Plane(origin=(0, 1.25, 1.25), x_dir=(1, 0, 0), z_dir=(0, 0.7071067812, 0.7071067812)), keep=Keep.TOP)


with BuildPart() as f3_13:
    add(f3_12.part)

    # F6_t31: cut F6_tool32
    add(f6_tool32.part, mode=Mode.SUBTRACT)


with BuildPart() as f6_tool37:
    # F6_s38 → F6_t39 (new body)
    with BuildSketch(Plane.YZ.offset(-5.2714032343)):
        with BuildLine():
            ThreePointArc((-1.2071067812, 3.7071067812), (-1.53153013, 3.9238795325), (-1.9142135624, 4))
            Line((-1.9142135624, 4), (-1.5, 4))
            Line((-1.5, 4), (-1.2071067812, 3.7071067812))
        make_face()
    extrude(amount=F6_T39_DEPTH)

    split(bisect_by=Plane(origin=(0.7866504888, -0.9714324518, 1.25), x_dir=(0.7771459615, 0.629320391, 0), z_dir=(0.4449967161, -0.5495251793, 0.7071067812)), keep=Keep.TOP)


with BuildPart() as f3_14:
    add(f3_13.part)

    # F6_t36: cut F6_tool37
    add(f6_tool37.part, mode=Mode.SUBTRACT)


with BuildPart() as f6_tool42:
    # F6_s43 → F6_t44 (new body)
    with BuildSketch(Plane.YZ.offset(-2.924414976)):
        with BuildLine():
            ThreePointArc((-3.8000721519, 4), (-4.1827555843, 3.9238795325), (-4.5071789331, 3.7071067812))
            Line((-4.5071789331, 3.7071067812), (-4.2142857143, 4))
            Line((-4.2142857143, 4), (-3.8000721519, 4))
        make_face()
    extrude(amount=F6_T44_DEPTH)

    split(bisect_by=Plane(origin=(-0.7620850308, 0.6474769539, 1), x_dir=(-0.6474769539, -0.7620850308, 0), z_dir=(-0.5388754931, 0.4578353448, 0.7071067812)), keep=Keep.TOP)


with BuildPart() as f3_15:
    add(f3_14.part)

    # F6_t41: cut F6_tool42
    add(f6_tool42.part, mode=Mode.SUBTRACT)


with BuildPart() as f6_tool47:
    # F6_s48 → F6_t49 (new body)
    with BuildSketch(Plane(origin=(-9.4126080245, -11.078707332, 0), x_dir=(0, 0, 1), z_dir=(0.6474769539, 0.7620850308, 0))):
        with BuildLine():
            ThreePointArc((4, 2.4142135624), (3.9238795325, 2.03153013), (3.7071067812, 1.7071067812))
            Line((3.7071067812, 1.7071067812), (4, 2))
            Line((4, 2), (4, 2.4142135624))
        make_face()
    extrude(amount=F6_T49_DEPTH)

    split(bisect_by=Plane(origin=(0, -4.1071428571, 4.1071428571), x_dir=(1, 0, 0), z_dir=(0, -0.7071067812, 0.7071067812)), keep=Keep.TOP)


with BuildPart() as f3_16:
    add(f3_15.part)

    # F6_t46: cut F6_tool47
    add(f6_tool47.part, mode=Mode.SUBTRACT)


with BuildPart() as f6_tool53:
    # F6_s54 → F6_t55 (new body)
    with BuildSketch(Plane(origin=(11.9599620904, 18.9117810419, 0), x_dir=(0, 0, 1), z_dir=(-0.5344938035, -0.8451723931, 0))):
        with BuildLine():
            ThreePointArc((4, 2.8491199883), (3.9238795325, 2.4664365559), (3.7071067812, 2.1420132071))
            Line((3.7071067812, 2.1420132071), (4, 2.4349064259))
            Line((4, 2.4349064259), (4, 2.8491199883))
        make_face()
    extrude(amount=F6_T55_DEPTH)

    split(bisect_by=Plane(origin=(0.2631936405, 6.5257137352, 6.5310191124), x_dir=(0.9991876647, -0.0402990155, 0), z_dir=(-0.0284957071, -0.7065323734, -0.7071067812)), keep=Keep.TOP)


with BuildPart() as f6_tool57:
    # F6_s58 → F6_t59 (new body)
    with BuildSketch(Plane(origin=(9.0674940614, -0.3657081614, 0), x_dir=(0, 0, 1), z_dir=(-0.9991876647, 0.0402990155, 0))):
        with BuildLine():
            ThreePointArc((4, 8.6478246624), (3.9238795325, 9.0305080948), (3.7071067812, 9.3549314436))
            Line((3.7071067812, 9.3549314436), (4, 9.0620382248))
            Line((4, 9.0620382248), (4, 8.6478246624))
        make_face()
    extrude(amount=F6_T59_DEPTH)

    split(bisect_by=Plane(origin=(0.6613869407, -0.4182664087, 0.7825467871), x_dir=(-0.5344938035, -0.8451723931, 0), z_dir=(-0.5976271304, 0.377944193, -0.7071067812)), keep=Keep.TOP)


with BuildPart() as f6_tool53_1:
    add(f6_tool53.part)

    # F6_t61: intersect F6_tool57
    add(f6_tool57.part, mode=Mode.INTERSECT)


with BuildPart() as f3_17:
    add(f3_16.part)

    # F6_t51: cut F6_tool53
    add(f6_tool53_1.part, mode=Mode.SUBTRACT)


with BuildPart() as f6_tool64:
    # F6_s65 → F6_t66 (new body)
    with BuildSketch(Plane(origin=(-2.7437856705, -2.7992212842, 0), x_dir=(0, 0, 1), z_dir=(0.7, 0.7141428429, 0))):
        with BuildLine():
            ThreePointArc((4, -2.0849863576), (3.9238795325, -2.46766979), (3.7071067812, -2.7920931388))
            Line((3.7071067812, -2.7920931388), (4, -2.49919992))
            Line((4, -2.49919992), (4, -2.0849863576))
        make_face()
    extrude(amount=F6_T66_DEPTH)

    split(bisect_by=Plane(origin=(0.0206083084, 1.6062040743, -1.6063362757), x_dir=(-0.9999177, 0.0128293861, 0), z_dir=(0.0090717459, 0.7070485863, -0.7071067812)), keep=Keep.TOP)


with BuildPart() as f6_tool68:
    # F6_s69 → F6_t70 (new body)
    with BuildSketch(Plane(origin=(1.3596181679, -0.0174445022, 0), x_dir=(0, 0, 1), z_dir=(0.9999177, -0.0128293861, 0))):
        with BuildLine():
            ThreePointArc((4, -7.6268861138), (3.9238795325, -7.2442026814), (3.7071067812, -6.9197793326))
            Line((3.7071067812, -6.9197793326), (4, -7.2126725514))
            Line((4, -7.2126725514), (4, -7.6268861138))
        make_face()
    extrude(amount=F6_T70_DEPTH)

    split(bisect_by=Plane(origin=(-2.3206785536, 2.274719972, 3.24959996), x_dir=(0.7, 0.7141428429, 0), z_dir=(0.5049752469, -0.4949747468, -0.7071067812)), keep=Keep.TOP)


with BuildPart() as f6_tool64_1:
    add(f6_tool64.part)

    # F6_t72: intersect F6_tool68
    add(f6_tool68.part, mode=Mode.INTERSECT)


with BuildPart() as f3_18:
    add(f3_17.part)

    # F6_t62: cut F6_tool64
    add(f6_tool64_1.part, mode=Mode.SUBTRACT)


with BuildPart() as f6_tool75:
    # F6_s76 → F6_t77 (new body)
    with BuildSketch(Plane.YZ.offset(-5.2714032343)):
        with BuildLine():
            ThreePointArc((-1.2071067812, 3.7071067812), (-1.53153013, 3.9238795325), (-1.9142135624, 4))
            Line((-1.9142135624, 4), (-1.5, 4))
            Line((-1.5, 4), (-1.2071067812, 3.7071067812))
        make_face()
    extrude(amount=F6_T77_DEPTH)

    split(bisect_by=Plane(origin=(0.7866504888, -0.9714324518, 1.25), x_dir=(-0.7771459615, -0.629320391, 0), z_dir=(-0.4449967161, 0.5495251793, -0.7071067812)), keep=Keep.TOP)


with BuildPart() as f6_tool79:
    # F6_s80 → F6_t81 (new body)
    with BuildSketch(Plane(origin=(10.1467341546, 8.2166633075, 0), x_dir=(0, 0, 1), z_dir=(-0.7771459615, -0.629320391, 0))):
        with BuildLine():
            ThreePointArc((4, 1.9142135624), (3.9238795325, 1.53153013), (3.7071067812, 1.2071067812))
            Line((3.7071067812, 1.2071067812), (4, 1.5))
            Line((4, 1.5), (4, 1.9142135624))
        make_face()
    extrude(amount=F6_T81_DEPTH)

    split(bisect_by=Plane(origin=(0, 1.25, 1.25), x_dir=(1, 0, 0), z_dir=(0, -0.7071067812, -0.7071067812)), keep=Keep.TOP)


with BuildPart() as f6_tool75_1:
    add(f6_tool75.part)

    # F6_t83: intersect F6_tool79
    add(f6_tool79.part, mode=Mode.INTERSECT)


with BuildPart() as f3_19:
    add(f3_18.part)

    # F6_t73: cut F6_tool75
    add(f6_tool75_1.part, mode=Mode.SUBTRACT)


with BuildPart() as f6_tool86:
    # F6_s87 → F6_t88 (new body)
    with BuildSketch(Plane(origin=(-9.4126080245, -11.078707332, 0), x_dir=(0, 0, 1), z_dir=(0.6474769539, 0.7620850308, 0))):
        with BuildLine():
            ThreePointArc((4, 2.4142135624), (3.9238795325, 2.03153013), (3.7071067812, 1.7071067812))
            Line((3.7071067812, 1.7071067812), (4, 2))
            Line((4, 2), (4, 2.4142135624))
        make_face()
    extrude(amount=F6_T88_DEPTH)

    split(bisect_by=Plane(origin=(0, -4.1071428572, 4.1071428572), x_dir=(1, 0, 0), z_dir=(0, 0.7071067812, -0.7071067812)), keep=Keep.TOP)


with BuildPart() as f6_tool90:
    # F6_s91 → F6_t92 (new body)
    with BuildSketch(Plane.YZ.offset(-2.924414976)):
        with BuildLine():
            ThreePointArc((-3.8000721519, 4), (-4.1827555843, 3.9238795325), (-4.5071789331, 3.7071067812))
            Line((-4.5071789331, 3.7071067812), (-4.2142857143, 4))
            Line((-4.2142857143, 4), (-3.8000721519, 4))
        make_face()
    extrude(amount=F6_T92_DEPTH)

    split(bisect_by=Plane(origin=(-0.7620850308, 0.6474769539, 1), x_dir=(0.6474769539, 0.7620850308, 0), z_dir=(0.5388754931, -0.4578353448, -0.7071067812)), keep=Keep.TOP)


with BuildPart() as f6_tool86_1:
    add(f6_tool86.part)

    # F6_t94: intersect F6_tool90
    add(f6_tool90.part, mode=Mode.INTERSECT)


with BuildPart() as f3_20:
    add(f3_19.part)

    # F6_t84: cut F6_tool86
    add(f6_tool86_1.part, mode=Mode.SUBTRACT)


solid = Compound([f1_1.part, f1b_1.part, f3_20.part])
